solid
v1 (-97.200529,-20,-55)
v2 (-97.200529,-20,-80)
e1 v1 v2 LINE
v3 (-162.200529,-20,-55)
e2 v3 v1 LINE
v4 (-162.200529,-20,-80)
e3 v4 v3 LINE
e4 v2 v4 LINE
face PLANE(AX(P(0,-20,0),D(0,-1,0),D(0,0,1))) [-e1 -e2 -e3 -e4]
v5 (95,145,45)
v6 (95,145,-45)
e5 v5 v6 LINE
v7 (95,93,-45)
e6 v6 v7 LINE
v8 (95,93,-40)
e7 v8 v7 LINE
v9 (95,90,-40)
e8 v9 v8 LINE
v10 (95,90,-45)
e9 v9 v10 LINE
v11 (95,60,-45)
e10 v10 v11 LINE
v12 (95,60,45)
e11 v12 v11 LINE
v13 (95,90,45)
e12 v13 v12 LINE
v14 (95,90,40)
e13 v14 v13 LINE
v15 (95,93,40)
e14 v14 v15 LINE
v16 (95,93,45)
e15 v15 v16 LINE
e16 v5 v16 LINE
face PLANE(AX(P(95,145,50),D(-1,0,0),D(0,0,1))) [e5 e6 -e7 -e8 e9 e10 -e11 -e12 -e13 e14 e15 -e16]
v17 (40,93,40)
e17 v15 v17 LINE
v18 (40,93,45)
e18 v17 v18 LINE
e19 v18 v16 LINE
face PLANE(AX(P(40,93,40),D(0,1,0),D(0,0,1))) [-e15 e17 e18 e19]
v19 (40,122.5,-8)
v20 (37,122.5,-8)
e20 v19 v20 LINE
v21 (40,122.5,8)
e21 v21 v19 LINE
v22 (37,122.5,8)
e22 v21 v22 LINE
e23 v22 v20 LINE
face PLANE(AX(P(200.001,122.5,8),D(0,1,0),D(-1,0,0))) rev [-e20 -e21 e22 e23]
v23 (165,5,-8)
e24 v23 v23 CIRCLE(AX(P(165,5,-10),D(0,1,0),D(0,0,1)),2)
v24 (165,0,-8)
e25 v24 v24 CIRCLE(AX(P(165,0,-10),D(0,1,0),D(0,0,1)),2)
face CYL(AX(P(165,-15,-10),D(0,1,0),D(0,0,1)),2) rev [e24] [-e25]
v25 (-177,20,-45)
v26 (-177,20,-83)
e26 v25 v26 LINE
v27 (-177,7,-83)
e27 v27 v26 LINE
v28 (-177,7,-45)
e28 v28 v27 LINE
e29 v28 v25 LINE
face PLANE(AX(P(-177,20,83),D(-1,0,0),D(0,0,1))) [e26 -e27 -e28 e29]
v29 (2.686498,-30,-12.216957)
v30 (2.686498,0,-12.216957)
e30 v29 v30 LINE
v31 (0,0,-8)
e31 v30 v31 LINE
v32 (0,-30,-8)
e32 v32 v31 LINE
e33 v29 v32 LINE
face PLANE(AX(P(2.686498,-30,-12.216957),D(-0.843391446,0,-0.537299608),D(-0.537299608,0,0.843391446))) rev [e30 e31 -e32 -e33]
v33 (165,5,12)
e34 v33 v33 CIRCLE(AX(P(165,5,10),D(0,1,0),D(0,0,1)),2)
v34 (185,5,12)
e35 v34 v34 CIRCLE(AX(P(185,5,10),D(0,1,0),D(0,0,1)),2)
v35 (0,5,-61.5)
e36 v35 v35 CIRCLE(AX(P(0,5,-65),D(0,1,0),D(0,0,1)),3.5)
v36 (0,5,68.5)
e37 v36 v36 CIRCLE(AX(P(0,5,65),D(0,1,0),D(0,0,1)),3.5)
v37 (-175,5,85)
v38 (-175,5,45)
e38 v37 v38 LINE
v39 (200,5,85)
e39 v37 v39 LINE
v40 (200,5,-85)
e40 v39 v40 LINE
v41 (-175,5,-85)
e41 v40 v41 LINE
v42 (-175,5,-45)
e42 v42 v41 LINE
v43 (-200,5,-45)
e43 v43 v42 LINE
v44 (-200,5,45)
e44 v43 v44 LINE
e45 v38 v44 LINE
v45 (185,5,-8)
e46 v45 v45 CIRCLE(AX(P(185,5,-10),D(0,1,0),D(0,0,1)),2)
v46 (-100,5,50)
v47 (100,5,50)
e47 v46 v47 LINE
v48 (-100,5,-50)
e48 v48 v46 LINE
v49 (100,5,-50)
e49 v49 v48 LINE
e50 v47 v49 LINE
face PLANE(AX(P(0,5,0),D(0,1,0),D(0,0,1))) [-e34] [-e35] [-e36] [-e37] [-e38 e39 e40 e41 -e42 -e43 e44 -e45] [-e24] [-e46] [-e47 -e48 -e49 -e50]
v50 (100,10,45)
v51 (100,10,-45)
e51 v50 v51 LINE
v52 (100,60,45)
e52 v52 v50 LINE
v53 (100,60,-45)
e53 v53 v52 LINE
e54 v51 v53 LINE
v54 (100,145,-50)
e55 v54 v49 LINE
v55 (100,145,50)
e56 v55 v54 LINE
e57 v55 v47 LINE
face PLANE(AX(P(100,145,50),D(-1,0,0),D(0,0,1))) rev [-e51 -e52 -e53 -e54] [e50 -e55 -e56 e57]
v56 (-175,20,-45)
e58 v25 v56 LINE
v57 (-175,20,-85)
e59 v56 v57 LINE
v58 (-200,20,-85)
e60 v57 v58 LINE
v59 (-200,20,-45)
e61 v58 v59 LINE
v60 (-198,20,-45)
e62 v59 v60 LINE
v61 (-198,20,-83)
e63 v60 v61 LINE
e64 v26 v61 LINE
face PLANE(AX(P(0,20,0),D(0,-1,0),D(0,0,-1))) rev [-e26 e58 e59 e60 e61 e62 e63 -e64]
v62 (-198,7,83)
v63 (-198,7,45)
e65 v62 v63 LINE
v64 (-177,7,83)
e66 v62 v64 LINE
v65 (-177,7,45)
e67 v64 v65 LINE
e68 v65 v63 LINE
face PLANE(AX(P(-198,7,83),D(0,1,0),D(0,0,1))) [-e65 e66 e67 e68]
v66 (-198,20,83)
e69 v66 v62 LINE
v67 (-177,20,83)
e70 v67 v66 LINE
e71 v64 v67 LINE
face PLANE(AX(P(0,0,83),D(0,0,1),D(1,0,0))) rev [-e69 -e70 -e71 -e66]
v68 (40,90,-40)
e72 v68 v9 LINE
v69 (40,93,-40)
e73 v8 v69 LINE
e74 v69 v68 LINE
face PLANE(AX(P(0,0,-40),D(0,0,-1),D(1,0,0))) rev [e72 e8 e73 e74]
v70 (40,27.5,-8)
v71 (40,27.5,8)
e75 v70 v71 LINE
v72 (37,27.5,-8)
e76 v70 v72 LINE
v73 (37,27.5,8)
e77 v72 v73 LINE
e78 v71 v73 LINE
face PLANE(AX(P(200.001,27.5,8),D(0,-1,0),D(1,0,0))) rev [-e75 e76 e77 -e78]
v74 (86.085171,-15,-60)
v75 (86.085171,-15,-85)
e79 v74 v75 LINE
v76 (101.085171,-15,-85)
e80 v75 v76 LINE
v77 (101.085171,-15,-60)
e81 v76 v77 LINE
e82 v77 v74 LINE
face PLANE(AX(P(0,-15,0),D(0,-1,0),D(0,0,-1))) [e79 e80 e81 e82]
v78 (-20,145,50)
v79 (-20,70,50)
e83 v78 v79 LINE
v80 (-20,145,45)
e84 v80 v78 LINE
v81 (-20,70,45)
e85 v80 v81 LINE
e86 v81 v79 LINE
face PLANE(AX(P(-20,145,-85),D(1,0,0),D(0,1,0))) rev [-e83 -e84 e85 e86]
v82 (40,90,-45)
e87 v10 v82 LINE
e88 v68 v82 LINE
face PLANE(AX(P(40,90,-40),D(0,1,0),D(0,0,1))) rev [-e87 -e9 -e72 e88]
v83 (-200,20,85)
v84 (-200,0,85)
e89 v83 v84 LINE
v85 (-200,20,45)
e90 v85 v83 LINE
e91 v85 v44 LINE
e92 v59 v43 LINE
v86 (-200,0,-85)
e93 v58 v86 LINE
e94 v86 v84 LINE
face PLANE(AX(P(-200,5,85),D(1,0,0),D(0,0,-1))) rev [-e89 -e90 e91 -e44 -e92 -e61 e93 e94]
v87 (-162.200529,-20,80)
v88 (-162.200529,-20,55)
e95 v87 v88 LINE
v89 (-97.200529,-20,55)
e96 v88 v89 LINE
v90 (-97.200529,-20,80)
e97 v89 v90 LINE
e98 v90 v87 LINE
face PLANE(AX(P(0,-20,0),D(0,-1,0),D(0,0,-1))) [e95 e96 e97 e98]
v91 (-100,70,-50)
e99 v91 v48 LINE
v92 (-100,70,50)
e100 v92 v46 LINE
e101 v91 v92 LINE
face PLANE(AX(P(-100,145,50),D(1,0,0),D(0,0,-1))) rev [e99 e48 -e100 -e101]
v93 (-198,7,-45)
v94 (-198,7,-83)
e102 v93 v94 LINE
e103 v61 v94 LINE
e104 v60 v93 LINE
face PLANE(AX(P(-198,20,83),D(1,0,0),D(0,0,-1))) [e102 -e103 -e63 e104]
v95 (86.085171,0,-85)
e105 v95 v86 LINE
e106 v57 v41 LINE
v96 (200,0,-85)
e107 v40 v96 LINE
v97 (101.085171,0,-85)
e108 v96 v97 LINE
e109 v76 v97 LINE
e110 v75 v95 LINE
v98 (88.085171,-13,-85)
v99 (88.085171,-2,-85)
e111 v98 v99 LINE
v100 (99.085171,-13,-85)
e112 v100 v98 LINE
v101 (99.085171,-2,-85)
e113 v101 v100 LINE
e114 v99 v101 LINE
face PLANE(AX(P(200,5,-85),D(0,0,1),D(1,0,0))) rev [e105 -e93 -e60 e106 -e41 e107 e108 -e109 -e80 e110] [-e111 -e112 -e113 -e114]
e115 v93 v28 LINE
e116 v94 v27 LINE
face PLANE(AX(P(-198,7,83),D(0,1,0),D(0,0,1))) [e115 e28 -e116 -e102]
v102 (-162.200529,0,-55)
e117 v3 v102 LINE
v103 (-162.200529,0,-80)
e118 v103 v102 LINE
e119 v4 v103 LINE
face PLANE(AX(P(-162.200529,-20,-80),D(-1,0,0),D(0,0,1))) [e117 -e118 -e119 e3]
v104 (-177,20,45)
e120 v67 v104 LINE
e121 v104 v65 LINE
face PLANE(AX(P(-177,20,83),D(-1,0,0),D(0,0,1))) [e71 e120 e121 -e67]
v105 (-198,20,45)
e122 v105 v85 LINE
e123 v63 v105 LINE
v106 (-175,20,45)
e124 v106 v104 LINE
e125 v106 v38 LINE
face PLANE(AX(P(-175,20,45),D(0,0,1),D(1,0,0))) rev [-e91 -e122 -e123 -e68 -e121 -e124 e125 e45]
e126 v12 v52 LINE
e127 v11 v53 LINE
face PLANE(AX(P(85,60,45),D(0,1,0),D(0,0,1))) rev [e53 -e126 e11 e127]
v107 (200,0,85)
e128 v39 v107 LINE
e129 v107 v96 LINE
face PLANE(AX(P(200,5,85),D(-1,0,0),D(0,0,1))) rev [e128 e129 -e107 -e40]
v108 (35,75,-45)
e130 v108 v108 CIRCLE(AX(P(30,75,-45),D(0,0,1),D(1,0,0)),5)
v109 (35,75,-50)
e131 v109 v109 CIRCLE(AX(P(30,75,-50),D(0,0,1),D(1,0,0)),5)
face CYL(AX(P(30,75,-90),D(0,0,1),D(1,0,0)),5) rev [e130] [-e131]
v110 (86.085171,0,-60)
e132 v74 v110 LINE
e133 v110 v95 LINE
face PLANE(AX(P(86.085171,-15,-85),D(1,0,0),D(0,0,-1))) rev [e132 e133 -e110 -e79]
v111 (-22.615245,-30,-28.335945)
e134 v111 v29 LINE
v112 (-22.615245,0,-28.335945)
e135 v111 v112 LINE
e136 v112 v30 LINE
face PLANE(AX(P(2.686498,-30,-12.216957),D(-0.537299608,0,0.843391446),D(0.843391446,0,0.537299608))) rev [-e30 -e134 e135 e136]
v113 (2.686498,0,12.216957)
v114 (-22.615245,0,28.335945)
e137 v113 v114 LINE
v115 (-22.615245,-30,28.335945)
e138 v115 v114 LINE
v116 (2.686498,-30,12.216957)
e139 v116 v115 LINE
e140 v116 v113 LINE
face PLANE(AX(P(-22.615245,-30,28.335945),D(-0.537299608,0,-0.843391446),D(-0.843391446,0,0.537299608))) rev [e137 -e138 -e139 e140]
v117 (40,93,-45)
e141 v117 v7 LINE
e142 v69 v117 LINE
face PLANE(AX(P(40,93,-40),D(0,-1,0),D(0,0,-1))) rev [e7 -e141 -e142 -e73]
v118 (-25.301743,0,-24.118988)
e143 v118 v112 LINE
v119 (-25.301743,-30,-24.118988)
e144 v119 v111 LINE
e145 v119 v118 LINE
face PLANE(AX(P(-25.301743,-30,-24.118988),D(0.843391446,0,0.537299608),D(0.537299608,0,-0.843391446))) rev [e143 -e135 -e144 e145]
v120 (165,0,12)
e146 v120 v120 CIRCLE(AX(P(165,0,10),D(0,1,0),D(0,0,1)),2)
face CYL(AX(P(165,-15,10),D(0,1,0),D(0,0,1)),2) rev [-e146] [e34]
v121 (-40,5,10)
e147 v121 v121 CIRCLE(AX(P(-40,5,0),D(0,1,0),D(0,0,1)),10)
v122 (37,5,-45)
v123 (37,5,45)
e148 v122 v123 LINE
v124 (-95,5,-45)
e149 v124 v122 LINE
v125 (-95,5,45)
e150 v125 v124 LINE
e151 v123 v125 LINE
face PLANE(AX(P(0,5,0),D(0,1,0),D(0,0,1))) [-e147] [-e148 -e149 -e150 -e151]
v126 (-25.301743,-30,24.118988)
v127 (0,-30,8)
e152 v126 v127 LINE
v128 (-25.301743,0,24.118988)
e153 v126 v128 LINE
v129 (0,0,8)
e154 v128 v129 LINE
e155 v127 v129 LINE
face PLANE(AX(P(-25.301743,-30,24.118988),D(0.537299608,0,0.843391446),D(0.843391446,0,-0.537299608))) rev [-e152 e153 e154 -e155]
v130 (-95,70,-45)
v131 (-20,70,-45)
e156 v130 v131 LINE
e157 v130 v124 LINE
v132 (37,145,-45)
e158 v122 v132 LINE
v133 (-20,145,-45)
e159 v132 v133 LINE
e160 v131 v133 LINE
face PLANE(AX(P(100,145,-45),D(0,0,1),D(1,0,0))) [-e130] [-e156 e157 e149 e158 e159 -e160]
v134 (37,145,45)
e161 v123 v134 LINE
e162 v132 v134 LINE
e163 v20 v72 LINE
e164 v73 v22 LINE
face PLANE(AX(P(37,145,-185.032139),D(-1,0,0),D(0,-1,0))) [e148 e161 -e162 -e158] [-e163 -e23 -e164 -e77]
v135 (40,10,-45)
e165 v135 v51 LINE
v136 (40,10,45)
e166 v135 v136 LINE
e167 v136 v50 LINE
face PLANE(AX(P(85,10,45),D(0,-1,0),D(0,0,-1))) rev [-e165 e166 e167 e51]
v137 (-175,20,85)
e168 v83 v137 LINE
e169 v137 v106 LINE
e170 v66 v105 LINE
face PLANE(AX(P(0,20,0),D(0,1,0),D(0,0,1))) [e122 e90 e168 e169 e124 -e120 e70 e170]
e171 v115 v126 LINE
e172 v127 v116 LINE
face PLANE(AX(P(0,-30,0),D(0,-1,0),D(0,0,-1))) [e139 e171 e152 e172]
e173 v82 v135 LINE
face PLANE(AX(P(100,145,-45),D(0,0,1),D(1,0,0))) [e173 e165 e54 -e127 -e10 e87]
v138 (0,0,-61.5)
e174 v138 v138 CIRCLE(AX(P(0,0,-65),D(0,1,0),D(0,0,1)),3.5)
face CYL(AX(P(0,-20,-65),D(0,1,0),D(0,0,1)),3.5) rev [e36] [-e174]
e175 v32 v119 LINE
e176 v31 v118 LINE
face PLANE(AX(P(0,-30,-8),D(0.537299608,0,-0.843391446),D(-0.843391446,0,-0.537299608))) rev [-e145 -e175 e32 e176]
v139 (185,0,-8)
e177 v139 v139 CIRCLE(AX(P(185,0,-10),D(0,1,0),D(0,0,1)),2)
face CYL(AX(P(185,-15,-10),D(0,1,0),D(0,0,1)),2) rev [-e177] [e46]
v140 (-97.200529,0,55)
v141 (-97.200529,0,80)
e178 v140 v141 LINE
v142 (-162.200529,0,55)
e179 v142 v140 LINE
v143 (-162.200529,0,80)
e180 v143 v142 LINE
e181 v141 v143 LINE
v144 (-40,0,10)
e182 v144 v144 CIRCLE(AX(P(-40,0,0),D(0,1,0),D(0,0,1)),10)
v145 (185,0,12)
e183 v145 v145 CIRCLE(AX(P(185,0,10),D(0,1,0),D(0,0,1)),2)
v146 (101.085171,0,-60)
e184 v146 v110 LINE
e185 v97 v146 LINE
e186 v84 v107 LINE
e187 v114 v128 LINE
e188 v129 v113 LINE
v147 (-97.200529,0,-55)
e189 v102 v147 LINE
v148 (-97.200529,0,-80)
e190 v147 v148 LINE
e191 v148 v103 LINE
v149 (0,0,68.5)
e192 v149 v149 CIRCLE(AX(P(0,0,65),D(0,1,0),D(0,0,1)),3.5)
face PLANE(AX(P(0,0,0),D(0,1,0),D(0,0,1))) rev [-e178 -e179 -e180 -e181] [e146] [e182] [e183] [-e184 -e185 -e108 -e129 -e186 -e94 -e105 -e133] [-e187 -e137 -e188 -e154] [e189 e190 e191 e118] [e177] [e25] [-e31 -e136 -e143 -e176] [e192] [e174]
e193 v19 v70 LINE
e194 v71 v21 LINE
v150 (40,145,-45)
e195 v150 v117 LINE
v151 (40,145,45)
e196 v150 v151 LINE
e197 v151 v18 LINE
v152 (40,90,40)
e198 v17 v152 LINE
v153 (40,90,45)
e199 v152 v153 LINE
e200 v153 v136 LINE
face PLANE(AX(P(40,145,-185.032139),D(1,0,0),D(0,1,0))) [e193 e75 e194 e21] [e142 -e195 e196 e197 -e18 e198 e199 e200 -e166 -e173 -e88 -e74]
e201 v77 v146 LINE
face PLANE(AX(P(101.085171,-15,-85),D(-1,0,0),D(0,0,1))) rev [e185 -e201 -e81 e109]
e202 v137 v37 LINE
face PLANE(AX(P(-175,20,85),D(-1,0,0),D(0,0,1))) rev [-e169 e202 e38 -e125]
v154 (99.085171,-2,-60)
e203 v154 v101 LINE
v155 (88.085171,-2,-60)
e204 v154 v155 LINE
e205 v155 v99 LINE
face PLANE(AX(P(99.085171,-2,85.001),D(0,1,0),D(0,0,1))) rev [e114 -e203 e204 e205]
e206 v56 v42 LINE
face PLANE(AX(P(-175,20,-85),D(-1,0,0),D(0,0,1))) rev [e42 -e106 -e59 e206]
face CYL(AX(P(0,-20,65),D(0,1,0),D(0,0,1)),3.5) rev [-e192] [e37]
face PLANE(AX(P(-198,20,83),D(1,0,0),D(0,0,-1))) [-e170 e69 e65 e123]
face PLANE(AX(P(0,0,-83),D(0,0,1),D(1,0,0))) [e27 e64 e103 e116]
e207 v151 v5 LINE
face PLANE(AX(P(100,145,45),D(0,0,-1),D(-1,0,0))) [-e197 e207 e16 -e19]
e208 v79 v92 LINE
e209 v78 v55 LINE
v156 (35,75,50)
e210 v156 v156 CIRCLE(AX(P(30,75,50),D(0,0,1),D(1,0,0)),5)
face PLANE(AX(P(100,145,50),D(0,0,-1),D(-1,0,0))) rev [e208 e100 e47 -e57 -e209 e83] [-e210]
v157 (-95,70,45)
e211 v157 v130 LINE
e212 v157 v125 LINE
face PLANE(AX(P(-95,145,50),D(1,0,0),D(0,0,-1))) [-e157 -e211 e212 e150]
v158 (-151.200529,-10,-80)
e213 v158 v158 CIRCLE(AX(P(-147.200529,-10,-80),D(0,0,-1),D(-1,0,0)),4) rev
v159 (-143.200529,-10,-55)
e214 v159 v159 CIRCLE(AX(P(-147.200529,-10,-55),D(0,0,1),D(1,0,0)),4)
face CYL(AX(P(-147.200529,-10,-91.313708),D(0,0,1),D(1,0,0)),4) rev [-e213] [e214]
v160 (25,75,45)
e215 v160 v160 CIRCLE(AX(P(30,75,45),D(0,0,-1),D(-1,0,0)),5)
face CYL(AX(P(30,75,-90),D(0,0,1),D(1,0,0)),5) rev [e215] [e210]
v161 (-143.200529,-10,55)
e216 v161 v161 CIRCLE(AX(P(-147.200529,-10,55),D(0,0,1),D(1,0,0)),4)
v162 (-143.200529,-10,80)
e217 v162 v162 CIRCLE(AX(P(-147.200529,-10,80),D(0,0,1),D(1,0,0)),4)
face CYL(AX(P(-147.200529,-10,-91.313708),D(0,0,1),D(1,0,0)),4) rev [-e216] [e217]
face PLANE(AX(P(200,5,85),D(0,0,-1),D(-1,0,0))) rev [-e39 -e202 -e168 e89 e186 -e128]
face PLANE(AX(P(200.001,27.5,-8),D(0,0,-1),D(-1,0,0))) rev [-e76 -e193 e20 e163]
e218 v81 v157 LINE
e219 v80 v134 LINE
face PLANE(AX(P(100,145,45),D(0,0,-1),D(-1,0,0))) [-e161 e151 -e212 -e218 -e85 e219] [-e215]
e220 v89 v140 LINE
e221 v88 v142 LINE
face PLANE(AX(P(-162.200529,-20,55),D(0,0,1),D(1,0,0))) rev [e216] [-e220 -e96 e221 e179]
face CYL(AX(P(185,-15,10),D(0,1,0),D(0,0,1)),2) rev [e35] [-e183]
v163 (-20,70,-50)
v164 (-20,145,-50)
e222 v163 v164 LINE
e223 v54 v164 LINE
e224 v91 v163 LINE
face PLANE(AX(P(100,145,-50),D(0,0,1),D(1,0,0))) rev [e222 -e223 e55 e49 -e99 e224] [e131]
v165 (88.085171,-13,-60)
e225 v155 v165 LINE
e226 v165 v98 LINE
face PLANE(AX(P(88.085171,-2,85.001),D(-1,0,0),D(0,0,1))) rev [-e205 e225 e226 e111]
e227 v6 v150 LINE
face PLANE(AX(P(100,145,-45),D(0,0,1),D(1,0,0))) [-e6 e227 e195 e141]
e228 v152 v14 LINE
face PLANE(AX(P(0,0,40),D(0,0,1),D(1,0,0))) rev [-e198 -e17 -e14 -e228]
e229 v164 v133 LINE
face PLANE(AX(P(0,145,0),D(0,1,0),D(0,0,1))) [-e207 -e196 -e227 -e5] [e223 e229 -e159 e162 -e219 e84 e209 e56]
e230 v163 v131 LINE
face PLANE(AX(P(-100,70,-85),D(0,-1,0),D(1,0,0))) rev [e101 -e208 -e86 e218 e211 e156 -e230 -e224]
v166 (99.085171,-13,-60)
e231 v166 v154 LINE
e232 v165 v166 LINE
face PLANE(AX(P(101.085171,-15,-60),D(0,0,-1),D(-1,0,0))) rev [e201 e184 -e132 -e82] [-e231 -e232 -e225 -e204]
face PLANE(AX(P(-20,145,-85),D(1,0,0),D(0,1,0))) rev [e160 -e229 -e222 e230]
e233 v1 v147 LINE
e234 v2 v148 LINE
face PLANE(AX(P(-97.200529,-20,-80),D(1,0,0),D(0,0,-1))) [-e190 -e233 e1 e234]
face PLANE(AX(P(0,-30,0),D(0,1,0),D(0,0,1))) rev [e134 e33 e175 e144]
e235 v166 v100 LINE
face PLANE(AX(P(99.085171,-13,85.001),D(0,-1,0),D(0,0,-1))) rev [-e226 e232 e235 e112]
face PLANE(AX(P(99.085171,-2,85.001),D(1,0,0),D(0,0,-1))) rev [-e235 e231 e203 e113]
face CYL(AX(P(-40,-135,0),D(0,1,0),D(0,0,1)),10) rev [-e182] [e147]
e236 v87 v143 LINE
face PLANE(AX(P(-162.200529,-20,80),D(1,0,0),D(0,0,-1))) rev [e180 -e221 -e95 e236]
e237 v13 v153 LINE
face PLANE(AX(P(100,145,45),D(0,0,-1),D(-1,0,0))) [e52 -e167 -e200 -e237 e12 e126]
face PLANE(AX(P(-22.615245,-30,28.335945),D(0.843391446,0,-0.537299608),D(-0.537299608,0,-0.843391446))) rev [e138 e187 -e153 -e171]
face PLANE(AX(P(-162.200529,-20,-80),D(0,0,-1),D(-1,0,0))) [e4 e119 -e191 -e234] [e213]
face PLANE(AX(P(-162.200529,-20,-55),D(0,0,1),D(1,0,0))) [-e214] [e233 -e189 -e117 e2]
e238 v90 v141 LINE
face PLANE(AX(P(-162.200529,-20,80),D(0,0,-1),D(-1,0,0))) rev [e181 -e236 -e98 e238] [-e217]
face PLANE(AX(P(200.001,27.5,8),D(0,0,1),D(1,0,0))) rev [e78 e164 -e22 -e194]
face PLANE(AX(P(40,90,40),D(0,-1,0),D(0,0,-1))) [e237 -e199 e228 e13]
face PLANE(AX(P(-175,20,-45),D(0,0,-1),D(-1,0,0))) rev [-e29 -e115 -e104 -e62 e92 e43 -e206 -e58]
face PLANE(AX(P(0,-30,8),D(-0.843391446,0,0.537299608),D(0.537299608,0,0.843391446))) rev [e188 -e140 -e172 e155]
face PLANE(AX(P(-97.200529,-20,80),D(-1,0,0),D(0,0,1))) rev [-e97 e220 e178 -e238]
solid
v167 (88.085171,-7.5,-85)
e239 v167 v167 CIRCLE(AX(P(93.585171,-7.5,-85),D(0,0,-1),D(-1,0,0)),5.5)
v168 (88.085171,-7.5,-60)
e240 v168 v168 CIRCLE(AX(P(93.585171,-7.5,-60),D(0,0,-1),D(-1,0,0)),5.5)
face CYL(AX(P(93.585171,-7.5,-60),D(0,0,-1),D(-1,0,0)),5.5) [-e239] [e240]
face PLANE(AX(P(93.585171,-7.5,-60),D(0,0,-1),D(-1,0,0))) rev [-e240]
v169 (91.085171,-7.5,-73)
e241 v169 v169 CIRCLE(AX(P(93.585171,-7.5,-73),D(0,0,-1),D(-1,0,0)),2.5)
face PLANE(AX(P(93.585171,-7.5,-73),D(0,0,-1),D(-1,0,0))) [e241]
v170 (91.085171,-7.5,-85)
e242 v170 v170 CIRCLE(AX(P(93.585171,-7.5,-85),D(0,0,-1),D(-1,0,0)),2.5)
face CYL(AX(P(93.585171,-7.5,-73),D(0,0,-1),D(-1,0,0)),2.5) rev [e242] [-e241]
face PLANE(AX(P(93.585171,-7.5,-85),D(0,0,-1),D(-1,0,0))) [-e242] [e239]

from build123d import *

# Parameters (mm, degrees)
SKETCH1_W                = 400
SKETCH1_H                = 170
BOSS_EXTRUDE1_DEPTH      = 5
SKETCH2_W                = 200
SKETCH2_H                = 100
BOSS_EXTRUDE2_DEPTH      = 140
SHELL1_START             = 5
SHELL1_OUTLINE_W         = 190
SHELL1_OUTLINE_H         = 90
SHELL1_DEPTH             = 140
CUT_EXTRUDE1_DEPTH       = 282.513765205
CUT_EXTRUDE1_DEPTH_BACK  = 282.513765205
SKETCH3_W                = 80
SKETCH3_H                = 75
SKETCH4_R                = 10
CUT_EXTRUDE2_DEPTH       = 140
SKETCH5_W                = 3
SKETCH5_H                = 140
BOSS_EXTRUDE3_DEPTH      = 95
CUT_EXTRUDE3_REACH       = 292.549
SKETCH6_W                = 16
SKETCH6_H                = 95
SKETCH7_R                = 5
CUT_EXTRUDE4_DEPTH       = 140
SKETCH8_W                = 65
SKETCH8_H                = 25
BOSS_EXTRUDE4_DEPTH      = 20
SKETCH9_R                = 2
CUT_EXTRUDE5_DEPTH       = 20
SKETCH21_R               = 3.5
CUT_EXTRUDE9_DEPTH       = 259.505319094
CUT_EXTRUDE10_REACH      = 299.069
SKETCH22_R               = 4
SKETCH35_W               = 90
SKETCH35_H               = 50
CUT_EXTRUDE14_DEPTH      = 15
SKETCH36_W               = 100
SKETCH36_H               = 5
BOSS_EXTRUDE17_DEPTH     = 60
SKETCH38_W               = 25
SKETCH38_H               = 40
BOSS_EXTRUDE19_DEPTH     = 15
CUT_EXTRUDE15_DEPTH      = 128
CUT_EXTRUDE15_DEPTH_BACK = 38
SKETCH39_W               = 21
SKETCH39_H               = 13
SKETCH41_W               = 55
SKETCH41_H               = 3
BOSS_EXTRUDE20_DEPTH     = 10
BOSS_EXTRUDE21_DEPTH     = 30
SKETCH43_W               = 15
SKETCH43_H               = 25
BOSS_EXTRUDE22_DEPTH     = 15
CUT_EXTRUDE16_REACH      = 301.875
SKETCH44_W               = 11
SKETCH44_H               = 11
SKETCH45_R               = 5.5
BOSS_EXTRUDE23_DEPTH     = 25
SKETCH46_R               = 2.5
CUT_EXTRUDE17_DEPTH      = 12


# Read off the part's stored shape, not the designer's step: Shell1
with BuildPart() as part:
    # Sketch1 → Boss-Extrude1 (new body)
    with BuildSketch(Plane(origin=(0, 0, 0), x_dir=(1, 0, 0), z_dir=(0, 1, 0))):
        Rectangle(SKETCH1_W, SKETCH1_H)
    extrude(amount=BOSS_EXTRUDE1_DEPTH)

    # Sketch2 → Boss-Extrude2 (add)
    with BuildSketch(Plane(origin=(0, 5, 0), x_dir=(1, 0, 0), z_dir=(0, 1, 0))):
        Rectangle(SKETCH2_W, SKETCH2_H)
    extrude(amount=BOSS_EXTRUDE2_DEPTH)

    # Shell1 outline → Shell1 (cut)
    with BuildSketch(Plane(origin=(0, 0, 0), x_dir=(1, 0, 0), z_dir=(0, 1, 0)).offset(SHELL1_START)):
        Rectangle(SHELL1_OUTLINE_W, SHELL1_OUTLINE_H)
    extrude(amount=SHELL1_DEPTH, mode=Mode.SUBTRACT)

    # Sketch3 → Cut-Extrude1 (cut, two sides: drawn at the far end of the back side and taken through both)
    with BuildSketch(Plane.XY.offset(50).offset(-CUT_EXTRUDE1_DEPTH_BACK)):
        with Locations((-60, 107.5)):
            Rectangle(SKETCH3_W, SKETCH3_H)
    extrude(amount=CUT_EXTRUDE1_DEPTH + CUT_EXTRUDE1_DEPTH_BACK, mode=Mode.SUBTRACT)

    # Sketch4 → Cut-Extrude2 (cut)
    with BuildSketch(Plane(origin=(0, 5, 0), x_dir=(1, 0, 0), z_dir=(0, 1, 0))):
        with Locations(Location((-40, 0, 0), (0, 0, 270))):
            Circle(SKETCH4_R)
    extrude(amount=-CUT_EXTRUDE2_DEPTH, mode=Mode.SUBTRACT)

    # Sketch5 → Boss-Extrude3 (add)
    with BuildSketch(Plane.XY.offset(50)):
        with Locations((38.5, 75)):
            Rectangle(SKETCH5_W, SKETCH5_H)
    extrude(amount=-BOSS_EXTRUDE3_DEPTH)

    # Sketch6 → Cut-Extrude3 (cut, up to next)
    with BuildSketch(Plane.ZY.offset(-37), mode=Mode.PRIVATE) as cut_extrude3_sk1:
        with Locations((0, 75)):
            Rectangle(SKETCH6_W, SKETCH6_H)
    cut_extrude3_tool1 = extrude(cut_extrude3_sk1.sketch, amount=-CUT_EXTRUDE3_REACH, mode=Mode.PRIVATE) & part.part
    add(cut_extrude3_tool1.solids().sort_by_distance((37, 75, 0))[0], mode=Mode.SUBTRACT)

    # Sketch7 → Cut-Extrude4 (cut)
    with BuildSketch(Plane.XY.offset(50)):
        with Locations((30, 75)):
            Circle(SKETCH7_R)
    extrude(amount=-CUT_EXTRUDE4_DEPTH, mode=Mode.SUBTRACT)

    # Sketch8 → Boss-Extrude4 (add)
    with BuildSketch(Plane.XZ):
        with Locations((-129.700529479, 67.5)):
            Rectangle(SKETCH8_W, SKETCH8_H)
    boss_extrude4 = extrude(amount=BOSS_EXTRUDE4_DEPTH)

    # Mirror1: Boss-Extrude4 across plane
    add(boss_extrude4.mirror(Plane.XY))

    # Sketch9 → Cut-Extrude5 (cut)
    with BuildSketch(Plane(origin=(0, 5, 0), x_dir=(1, 0, 0), z_dir=(0, 1, 0))):
        with Locations(Location((185, 10, 0), (0, 0, 270))):
            Circle(SKETCH9_R)
        with Locations(Location((185, -10, 0), (0, 0, 270))):
            Circle(SKETCH9_R)
        with Locations(Location((165, -10, 0), (0, 0, 270))):
            Circle(SKETCH9_R)
        with Locations(Location((165, 10, 0), (0, 0, 270))):
            Circle(SKETCH9_R)
    extrude(amount=-CUT_EXTRUDE5_DEPTH, mode=Mode.SUBTRACT)

    # Sketch21 → Cut-Extrude9 (cut, through all)
    with BuildSketch(Plane(origin=(0, 5, 0), x_dir=(1, 0, 0), z_dir=(0, 1, 0))):
        with Locations(Location((0, 65, 0), (0, 0, 270))):
            Circle(SKETCH21_R)
        with Locations(Location((0, -65, 0), (0, 0, 270))):
            Circle(SKETCH21_R)
    extrude(amount=-CUT_EXTRUDE9_DEPTH, mode=Mode.SUBTRACT)

    # Cut-Extrude10: up to this face of the body (flat: up to its plane)
    cut_extrude10_end = Plane(part.part.faces().sort_by_distance((-129.700529479, -10, -80))[0])
    # Sketch22 → Cut-Extrude10 (cut, up to the picked face)
    with BuildSketch(Plane.XY.offset(80), mode=Mode.PRIVATE) as cut_extrude10_sk1:
        with Locations((-147.200529479, -10)):
            Circle(SKETCH22_R)
    cut_extrude10_tool1 = split(extrude(cut_extrude10_sk1.sketch, amount=-CUT_EXTRUDE10_REACH, mode=Mode.PRIVATE), bisect_by=cut_extrude10_end, keep=Keep.BOTH, mode=Mode.PRIVATE)
    add(cut_extrude10_tool1.solids().sort_by(Axis((-147.200529, -10, 80), (0, 0, -1)))[0], mode=Mode.SUBTRACT)

    # Sketch35 → Cut-Extrude14 (cut)
    with BuildSketch(Plane(origin=(100, 0, 0), x_dir=(0, 0, -1), z_dir=(1, 0, 0))):
        with Locations((0, 35)):
            Rectangle(SKETCH35_W, SKETCH35_H)
    extrude(amount=-CUT_EXTRUDE14_DEPTH, mode=Mode.SUBTRACT)

    # Sketch36 → Boss-Extrude17 (add)
    with BuildSketch(Plane(origin=(100, 0, 0), x_dir=(0, 0, -1), z_dir=(1, 0, 0))):
        with Locations((0, 7.5)):
            Rectangle(SKETCH36_W, SKETCH36_H)
    extrude(amount=-BOSS_EXTRUDE17_DEPTH)

    # Sketch38 → Boss-Extrude19 (add)
    with BuildSketch(Plane(origin=(0, 5, 0), x_dir=(1, 0, 0), z_dir=(0, 1, 0))):
        with Locations((-187.5, 65)):
            Rectangle(SKETCH38_W, SKETCH38_H)
        with Locations((-187.5, -65)):
            Rectangle(SKETCH38_W, SKETCH38_H)
    extrude(amount=BOSS_EXTRUDE19_DEPTH)

    # Sketch39 → Cut-Extrude15 (cut, two sides: drawn at the far end of the back side and taken through both)
    with BuildSketch(Plane.XY.offset(-45).offset(-CUT_EXTRUDE15_DEPTH_BACK)):
        with Locations((-187.5, 13.5)):
            Rectangle(SKETCH39_W, SKETCH39_H)
    extrude(amount=CUT_EXTRUDE15_DEPTH + CUT_EXTRUDE15_DEPTH_BACK, mode=Mode.SUBTRACT)

    # Sketch41 → Boss-Extrude20 (add)
    with BuildSketch(Plane.XY.offset(50)):
        with Locations((67.5, 91.5)):
            Rectangle(SKETCH41_W, SKETCH41_H)
    boss_extrude20 = extrude(amount=-BOSS_EXTRUDE20_DEPTH)

    # Mirror2: Boss-Extrude20 across plane
    add(boss_extrude20.mirror(Plane.XY))

    # Sketch42 → Boss-Extrude21 (add)
    with BuildSketch(Plane.XZ):
        Polygon((-22.615245333, 28.335945479), (2.686498042, 12.216957229), (0, 8), (-25.301743374, 24.11898825), align=None)
        Polygon((2.686498042, -12.216957229), (-22.615245333, -28.335945479), (-25.301743374, -24.11898825), (0, -8), align=None)
    extrude(amount=BOSS_EXTRUDE21_DEPTH)

    # Sketch43 → Boss-Extrude22 (add)
    with BuildSketch(Plane.XZ):
        with Locations((93.585171048, -72.5)):
            Rectangle(SKETCH43_W, SKETCH43_H)
    extrude(amount=BOSS_EXTRUDE22_DEPTH)

    # Sketch44 → Cut-Extrude16 (cut, up to next)
    with BuildSketch(Plane(origin=(0, 0, -85), x_dir=(-1, 0, 0), z_dir=(0, 0, -1)), mode=Mode.PRIVATE) as cut_extrude16_sk1:
        with Locations((-93.585171048, -7.5)):
            Rectangle(SKETCH44_W, SKETCH44_H)
    cut_extrude16_tool1 = extrude(cut_extrude16_sk1.sketch, amount=-CUT_EXTRUDE16_REACH, mode=Mode.PRIVATE) & part.part
    add(cut_extrude16_tool1.solids().sort_by_distance((93.585171, -7.5, -85))[0], mode=Mode.SUBTRACT)


with BuildPart() as body_2:
    # Sketch45 → Boss-Extrude23 (new body)
    with BuildSketch(Plane(origin=(0, 0, -85), x_dir=(-1, 0, 0), z_dir=(0, 0, -1))):
        with Locations((-93.585171048, -7.5)):
            Circle(SKETCH45_R)
    extrude(amount=-BOSS_EXTRUDE23_DEPTH)

    # Sketch46 → Cut-Extrude17 (cut)
    with BuildSketch(Plane(origin=(0, 0, -85), x_dir=(-1, 0, 0), z_dir=(0, 0, -1))):
        with Locations((-93.585171048, -7.5)):
            Circle(SKETCH46_R)
    extrude(amount=-CUT_EXTRUDE17_DEPTH, mode=Mode.SUBTRACT)


solid = Compound([part.part, body_2.part])
